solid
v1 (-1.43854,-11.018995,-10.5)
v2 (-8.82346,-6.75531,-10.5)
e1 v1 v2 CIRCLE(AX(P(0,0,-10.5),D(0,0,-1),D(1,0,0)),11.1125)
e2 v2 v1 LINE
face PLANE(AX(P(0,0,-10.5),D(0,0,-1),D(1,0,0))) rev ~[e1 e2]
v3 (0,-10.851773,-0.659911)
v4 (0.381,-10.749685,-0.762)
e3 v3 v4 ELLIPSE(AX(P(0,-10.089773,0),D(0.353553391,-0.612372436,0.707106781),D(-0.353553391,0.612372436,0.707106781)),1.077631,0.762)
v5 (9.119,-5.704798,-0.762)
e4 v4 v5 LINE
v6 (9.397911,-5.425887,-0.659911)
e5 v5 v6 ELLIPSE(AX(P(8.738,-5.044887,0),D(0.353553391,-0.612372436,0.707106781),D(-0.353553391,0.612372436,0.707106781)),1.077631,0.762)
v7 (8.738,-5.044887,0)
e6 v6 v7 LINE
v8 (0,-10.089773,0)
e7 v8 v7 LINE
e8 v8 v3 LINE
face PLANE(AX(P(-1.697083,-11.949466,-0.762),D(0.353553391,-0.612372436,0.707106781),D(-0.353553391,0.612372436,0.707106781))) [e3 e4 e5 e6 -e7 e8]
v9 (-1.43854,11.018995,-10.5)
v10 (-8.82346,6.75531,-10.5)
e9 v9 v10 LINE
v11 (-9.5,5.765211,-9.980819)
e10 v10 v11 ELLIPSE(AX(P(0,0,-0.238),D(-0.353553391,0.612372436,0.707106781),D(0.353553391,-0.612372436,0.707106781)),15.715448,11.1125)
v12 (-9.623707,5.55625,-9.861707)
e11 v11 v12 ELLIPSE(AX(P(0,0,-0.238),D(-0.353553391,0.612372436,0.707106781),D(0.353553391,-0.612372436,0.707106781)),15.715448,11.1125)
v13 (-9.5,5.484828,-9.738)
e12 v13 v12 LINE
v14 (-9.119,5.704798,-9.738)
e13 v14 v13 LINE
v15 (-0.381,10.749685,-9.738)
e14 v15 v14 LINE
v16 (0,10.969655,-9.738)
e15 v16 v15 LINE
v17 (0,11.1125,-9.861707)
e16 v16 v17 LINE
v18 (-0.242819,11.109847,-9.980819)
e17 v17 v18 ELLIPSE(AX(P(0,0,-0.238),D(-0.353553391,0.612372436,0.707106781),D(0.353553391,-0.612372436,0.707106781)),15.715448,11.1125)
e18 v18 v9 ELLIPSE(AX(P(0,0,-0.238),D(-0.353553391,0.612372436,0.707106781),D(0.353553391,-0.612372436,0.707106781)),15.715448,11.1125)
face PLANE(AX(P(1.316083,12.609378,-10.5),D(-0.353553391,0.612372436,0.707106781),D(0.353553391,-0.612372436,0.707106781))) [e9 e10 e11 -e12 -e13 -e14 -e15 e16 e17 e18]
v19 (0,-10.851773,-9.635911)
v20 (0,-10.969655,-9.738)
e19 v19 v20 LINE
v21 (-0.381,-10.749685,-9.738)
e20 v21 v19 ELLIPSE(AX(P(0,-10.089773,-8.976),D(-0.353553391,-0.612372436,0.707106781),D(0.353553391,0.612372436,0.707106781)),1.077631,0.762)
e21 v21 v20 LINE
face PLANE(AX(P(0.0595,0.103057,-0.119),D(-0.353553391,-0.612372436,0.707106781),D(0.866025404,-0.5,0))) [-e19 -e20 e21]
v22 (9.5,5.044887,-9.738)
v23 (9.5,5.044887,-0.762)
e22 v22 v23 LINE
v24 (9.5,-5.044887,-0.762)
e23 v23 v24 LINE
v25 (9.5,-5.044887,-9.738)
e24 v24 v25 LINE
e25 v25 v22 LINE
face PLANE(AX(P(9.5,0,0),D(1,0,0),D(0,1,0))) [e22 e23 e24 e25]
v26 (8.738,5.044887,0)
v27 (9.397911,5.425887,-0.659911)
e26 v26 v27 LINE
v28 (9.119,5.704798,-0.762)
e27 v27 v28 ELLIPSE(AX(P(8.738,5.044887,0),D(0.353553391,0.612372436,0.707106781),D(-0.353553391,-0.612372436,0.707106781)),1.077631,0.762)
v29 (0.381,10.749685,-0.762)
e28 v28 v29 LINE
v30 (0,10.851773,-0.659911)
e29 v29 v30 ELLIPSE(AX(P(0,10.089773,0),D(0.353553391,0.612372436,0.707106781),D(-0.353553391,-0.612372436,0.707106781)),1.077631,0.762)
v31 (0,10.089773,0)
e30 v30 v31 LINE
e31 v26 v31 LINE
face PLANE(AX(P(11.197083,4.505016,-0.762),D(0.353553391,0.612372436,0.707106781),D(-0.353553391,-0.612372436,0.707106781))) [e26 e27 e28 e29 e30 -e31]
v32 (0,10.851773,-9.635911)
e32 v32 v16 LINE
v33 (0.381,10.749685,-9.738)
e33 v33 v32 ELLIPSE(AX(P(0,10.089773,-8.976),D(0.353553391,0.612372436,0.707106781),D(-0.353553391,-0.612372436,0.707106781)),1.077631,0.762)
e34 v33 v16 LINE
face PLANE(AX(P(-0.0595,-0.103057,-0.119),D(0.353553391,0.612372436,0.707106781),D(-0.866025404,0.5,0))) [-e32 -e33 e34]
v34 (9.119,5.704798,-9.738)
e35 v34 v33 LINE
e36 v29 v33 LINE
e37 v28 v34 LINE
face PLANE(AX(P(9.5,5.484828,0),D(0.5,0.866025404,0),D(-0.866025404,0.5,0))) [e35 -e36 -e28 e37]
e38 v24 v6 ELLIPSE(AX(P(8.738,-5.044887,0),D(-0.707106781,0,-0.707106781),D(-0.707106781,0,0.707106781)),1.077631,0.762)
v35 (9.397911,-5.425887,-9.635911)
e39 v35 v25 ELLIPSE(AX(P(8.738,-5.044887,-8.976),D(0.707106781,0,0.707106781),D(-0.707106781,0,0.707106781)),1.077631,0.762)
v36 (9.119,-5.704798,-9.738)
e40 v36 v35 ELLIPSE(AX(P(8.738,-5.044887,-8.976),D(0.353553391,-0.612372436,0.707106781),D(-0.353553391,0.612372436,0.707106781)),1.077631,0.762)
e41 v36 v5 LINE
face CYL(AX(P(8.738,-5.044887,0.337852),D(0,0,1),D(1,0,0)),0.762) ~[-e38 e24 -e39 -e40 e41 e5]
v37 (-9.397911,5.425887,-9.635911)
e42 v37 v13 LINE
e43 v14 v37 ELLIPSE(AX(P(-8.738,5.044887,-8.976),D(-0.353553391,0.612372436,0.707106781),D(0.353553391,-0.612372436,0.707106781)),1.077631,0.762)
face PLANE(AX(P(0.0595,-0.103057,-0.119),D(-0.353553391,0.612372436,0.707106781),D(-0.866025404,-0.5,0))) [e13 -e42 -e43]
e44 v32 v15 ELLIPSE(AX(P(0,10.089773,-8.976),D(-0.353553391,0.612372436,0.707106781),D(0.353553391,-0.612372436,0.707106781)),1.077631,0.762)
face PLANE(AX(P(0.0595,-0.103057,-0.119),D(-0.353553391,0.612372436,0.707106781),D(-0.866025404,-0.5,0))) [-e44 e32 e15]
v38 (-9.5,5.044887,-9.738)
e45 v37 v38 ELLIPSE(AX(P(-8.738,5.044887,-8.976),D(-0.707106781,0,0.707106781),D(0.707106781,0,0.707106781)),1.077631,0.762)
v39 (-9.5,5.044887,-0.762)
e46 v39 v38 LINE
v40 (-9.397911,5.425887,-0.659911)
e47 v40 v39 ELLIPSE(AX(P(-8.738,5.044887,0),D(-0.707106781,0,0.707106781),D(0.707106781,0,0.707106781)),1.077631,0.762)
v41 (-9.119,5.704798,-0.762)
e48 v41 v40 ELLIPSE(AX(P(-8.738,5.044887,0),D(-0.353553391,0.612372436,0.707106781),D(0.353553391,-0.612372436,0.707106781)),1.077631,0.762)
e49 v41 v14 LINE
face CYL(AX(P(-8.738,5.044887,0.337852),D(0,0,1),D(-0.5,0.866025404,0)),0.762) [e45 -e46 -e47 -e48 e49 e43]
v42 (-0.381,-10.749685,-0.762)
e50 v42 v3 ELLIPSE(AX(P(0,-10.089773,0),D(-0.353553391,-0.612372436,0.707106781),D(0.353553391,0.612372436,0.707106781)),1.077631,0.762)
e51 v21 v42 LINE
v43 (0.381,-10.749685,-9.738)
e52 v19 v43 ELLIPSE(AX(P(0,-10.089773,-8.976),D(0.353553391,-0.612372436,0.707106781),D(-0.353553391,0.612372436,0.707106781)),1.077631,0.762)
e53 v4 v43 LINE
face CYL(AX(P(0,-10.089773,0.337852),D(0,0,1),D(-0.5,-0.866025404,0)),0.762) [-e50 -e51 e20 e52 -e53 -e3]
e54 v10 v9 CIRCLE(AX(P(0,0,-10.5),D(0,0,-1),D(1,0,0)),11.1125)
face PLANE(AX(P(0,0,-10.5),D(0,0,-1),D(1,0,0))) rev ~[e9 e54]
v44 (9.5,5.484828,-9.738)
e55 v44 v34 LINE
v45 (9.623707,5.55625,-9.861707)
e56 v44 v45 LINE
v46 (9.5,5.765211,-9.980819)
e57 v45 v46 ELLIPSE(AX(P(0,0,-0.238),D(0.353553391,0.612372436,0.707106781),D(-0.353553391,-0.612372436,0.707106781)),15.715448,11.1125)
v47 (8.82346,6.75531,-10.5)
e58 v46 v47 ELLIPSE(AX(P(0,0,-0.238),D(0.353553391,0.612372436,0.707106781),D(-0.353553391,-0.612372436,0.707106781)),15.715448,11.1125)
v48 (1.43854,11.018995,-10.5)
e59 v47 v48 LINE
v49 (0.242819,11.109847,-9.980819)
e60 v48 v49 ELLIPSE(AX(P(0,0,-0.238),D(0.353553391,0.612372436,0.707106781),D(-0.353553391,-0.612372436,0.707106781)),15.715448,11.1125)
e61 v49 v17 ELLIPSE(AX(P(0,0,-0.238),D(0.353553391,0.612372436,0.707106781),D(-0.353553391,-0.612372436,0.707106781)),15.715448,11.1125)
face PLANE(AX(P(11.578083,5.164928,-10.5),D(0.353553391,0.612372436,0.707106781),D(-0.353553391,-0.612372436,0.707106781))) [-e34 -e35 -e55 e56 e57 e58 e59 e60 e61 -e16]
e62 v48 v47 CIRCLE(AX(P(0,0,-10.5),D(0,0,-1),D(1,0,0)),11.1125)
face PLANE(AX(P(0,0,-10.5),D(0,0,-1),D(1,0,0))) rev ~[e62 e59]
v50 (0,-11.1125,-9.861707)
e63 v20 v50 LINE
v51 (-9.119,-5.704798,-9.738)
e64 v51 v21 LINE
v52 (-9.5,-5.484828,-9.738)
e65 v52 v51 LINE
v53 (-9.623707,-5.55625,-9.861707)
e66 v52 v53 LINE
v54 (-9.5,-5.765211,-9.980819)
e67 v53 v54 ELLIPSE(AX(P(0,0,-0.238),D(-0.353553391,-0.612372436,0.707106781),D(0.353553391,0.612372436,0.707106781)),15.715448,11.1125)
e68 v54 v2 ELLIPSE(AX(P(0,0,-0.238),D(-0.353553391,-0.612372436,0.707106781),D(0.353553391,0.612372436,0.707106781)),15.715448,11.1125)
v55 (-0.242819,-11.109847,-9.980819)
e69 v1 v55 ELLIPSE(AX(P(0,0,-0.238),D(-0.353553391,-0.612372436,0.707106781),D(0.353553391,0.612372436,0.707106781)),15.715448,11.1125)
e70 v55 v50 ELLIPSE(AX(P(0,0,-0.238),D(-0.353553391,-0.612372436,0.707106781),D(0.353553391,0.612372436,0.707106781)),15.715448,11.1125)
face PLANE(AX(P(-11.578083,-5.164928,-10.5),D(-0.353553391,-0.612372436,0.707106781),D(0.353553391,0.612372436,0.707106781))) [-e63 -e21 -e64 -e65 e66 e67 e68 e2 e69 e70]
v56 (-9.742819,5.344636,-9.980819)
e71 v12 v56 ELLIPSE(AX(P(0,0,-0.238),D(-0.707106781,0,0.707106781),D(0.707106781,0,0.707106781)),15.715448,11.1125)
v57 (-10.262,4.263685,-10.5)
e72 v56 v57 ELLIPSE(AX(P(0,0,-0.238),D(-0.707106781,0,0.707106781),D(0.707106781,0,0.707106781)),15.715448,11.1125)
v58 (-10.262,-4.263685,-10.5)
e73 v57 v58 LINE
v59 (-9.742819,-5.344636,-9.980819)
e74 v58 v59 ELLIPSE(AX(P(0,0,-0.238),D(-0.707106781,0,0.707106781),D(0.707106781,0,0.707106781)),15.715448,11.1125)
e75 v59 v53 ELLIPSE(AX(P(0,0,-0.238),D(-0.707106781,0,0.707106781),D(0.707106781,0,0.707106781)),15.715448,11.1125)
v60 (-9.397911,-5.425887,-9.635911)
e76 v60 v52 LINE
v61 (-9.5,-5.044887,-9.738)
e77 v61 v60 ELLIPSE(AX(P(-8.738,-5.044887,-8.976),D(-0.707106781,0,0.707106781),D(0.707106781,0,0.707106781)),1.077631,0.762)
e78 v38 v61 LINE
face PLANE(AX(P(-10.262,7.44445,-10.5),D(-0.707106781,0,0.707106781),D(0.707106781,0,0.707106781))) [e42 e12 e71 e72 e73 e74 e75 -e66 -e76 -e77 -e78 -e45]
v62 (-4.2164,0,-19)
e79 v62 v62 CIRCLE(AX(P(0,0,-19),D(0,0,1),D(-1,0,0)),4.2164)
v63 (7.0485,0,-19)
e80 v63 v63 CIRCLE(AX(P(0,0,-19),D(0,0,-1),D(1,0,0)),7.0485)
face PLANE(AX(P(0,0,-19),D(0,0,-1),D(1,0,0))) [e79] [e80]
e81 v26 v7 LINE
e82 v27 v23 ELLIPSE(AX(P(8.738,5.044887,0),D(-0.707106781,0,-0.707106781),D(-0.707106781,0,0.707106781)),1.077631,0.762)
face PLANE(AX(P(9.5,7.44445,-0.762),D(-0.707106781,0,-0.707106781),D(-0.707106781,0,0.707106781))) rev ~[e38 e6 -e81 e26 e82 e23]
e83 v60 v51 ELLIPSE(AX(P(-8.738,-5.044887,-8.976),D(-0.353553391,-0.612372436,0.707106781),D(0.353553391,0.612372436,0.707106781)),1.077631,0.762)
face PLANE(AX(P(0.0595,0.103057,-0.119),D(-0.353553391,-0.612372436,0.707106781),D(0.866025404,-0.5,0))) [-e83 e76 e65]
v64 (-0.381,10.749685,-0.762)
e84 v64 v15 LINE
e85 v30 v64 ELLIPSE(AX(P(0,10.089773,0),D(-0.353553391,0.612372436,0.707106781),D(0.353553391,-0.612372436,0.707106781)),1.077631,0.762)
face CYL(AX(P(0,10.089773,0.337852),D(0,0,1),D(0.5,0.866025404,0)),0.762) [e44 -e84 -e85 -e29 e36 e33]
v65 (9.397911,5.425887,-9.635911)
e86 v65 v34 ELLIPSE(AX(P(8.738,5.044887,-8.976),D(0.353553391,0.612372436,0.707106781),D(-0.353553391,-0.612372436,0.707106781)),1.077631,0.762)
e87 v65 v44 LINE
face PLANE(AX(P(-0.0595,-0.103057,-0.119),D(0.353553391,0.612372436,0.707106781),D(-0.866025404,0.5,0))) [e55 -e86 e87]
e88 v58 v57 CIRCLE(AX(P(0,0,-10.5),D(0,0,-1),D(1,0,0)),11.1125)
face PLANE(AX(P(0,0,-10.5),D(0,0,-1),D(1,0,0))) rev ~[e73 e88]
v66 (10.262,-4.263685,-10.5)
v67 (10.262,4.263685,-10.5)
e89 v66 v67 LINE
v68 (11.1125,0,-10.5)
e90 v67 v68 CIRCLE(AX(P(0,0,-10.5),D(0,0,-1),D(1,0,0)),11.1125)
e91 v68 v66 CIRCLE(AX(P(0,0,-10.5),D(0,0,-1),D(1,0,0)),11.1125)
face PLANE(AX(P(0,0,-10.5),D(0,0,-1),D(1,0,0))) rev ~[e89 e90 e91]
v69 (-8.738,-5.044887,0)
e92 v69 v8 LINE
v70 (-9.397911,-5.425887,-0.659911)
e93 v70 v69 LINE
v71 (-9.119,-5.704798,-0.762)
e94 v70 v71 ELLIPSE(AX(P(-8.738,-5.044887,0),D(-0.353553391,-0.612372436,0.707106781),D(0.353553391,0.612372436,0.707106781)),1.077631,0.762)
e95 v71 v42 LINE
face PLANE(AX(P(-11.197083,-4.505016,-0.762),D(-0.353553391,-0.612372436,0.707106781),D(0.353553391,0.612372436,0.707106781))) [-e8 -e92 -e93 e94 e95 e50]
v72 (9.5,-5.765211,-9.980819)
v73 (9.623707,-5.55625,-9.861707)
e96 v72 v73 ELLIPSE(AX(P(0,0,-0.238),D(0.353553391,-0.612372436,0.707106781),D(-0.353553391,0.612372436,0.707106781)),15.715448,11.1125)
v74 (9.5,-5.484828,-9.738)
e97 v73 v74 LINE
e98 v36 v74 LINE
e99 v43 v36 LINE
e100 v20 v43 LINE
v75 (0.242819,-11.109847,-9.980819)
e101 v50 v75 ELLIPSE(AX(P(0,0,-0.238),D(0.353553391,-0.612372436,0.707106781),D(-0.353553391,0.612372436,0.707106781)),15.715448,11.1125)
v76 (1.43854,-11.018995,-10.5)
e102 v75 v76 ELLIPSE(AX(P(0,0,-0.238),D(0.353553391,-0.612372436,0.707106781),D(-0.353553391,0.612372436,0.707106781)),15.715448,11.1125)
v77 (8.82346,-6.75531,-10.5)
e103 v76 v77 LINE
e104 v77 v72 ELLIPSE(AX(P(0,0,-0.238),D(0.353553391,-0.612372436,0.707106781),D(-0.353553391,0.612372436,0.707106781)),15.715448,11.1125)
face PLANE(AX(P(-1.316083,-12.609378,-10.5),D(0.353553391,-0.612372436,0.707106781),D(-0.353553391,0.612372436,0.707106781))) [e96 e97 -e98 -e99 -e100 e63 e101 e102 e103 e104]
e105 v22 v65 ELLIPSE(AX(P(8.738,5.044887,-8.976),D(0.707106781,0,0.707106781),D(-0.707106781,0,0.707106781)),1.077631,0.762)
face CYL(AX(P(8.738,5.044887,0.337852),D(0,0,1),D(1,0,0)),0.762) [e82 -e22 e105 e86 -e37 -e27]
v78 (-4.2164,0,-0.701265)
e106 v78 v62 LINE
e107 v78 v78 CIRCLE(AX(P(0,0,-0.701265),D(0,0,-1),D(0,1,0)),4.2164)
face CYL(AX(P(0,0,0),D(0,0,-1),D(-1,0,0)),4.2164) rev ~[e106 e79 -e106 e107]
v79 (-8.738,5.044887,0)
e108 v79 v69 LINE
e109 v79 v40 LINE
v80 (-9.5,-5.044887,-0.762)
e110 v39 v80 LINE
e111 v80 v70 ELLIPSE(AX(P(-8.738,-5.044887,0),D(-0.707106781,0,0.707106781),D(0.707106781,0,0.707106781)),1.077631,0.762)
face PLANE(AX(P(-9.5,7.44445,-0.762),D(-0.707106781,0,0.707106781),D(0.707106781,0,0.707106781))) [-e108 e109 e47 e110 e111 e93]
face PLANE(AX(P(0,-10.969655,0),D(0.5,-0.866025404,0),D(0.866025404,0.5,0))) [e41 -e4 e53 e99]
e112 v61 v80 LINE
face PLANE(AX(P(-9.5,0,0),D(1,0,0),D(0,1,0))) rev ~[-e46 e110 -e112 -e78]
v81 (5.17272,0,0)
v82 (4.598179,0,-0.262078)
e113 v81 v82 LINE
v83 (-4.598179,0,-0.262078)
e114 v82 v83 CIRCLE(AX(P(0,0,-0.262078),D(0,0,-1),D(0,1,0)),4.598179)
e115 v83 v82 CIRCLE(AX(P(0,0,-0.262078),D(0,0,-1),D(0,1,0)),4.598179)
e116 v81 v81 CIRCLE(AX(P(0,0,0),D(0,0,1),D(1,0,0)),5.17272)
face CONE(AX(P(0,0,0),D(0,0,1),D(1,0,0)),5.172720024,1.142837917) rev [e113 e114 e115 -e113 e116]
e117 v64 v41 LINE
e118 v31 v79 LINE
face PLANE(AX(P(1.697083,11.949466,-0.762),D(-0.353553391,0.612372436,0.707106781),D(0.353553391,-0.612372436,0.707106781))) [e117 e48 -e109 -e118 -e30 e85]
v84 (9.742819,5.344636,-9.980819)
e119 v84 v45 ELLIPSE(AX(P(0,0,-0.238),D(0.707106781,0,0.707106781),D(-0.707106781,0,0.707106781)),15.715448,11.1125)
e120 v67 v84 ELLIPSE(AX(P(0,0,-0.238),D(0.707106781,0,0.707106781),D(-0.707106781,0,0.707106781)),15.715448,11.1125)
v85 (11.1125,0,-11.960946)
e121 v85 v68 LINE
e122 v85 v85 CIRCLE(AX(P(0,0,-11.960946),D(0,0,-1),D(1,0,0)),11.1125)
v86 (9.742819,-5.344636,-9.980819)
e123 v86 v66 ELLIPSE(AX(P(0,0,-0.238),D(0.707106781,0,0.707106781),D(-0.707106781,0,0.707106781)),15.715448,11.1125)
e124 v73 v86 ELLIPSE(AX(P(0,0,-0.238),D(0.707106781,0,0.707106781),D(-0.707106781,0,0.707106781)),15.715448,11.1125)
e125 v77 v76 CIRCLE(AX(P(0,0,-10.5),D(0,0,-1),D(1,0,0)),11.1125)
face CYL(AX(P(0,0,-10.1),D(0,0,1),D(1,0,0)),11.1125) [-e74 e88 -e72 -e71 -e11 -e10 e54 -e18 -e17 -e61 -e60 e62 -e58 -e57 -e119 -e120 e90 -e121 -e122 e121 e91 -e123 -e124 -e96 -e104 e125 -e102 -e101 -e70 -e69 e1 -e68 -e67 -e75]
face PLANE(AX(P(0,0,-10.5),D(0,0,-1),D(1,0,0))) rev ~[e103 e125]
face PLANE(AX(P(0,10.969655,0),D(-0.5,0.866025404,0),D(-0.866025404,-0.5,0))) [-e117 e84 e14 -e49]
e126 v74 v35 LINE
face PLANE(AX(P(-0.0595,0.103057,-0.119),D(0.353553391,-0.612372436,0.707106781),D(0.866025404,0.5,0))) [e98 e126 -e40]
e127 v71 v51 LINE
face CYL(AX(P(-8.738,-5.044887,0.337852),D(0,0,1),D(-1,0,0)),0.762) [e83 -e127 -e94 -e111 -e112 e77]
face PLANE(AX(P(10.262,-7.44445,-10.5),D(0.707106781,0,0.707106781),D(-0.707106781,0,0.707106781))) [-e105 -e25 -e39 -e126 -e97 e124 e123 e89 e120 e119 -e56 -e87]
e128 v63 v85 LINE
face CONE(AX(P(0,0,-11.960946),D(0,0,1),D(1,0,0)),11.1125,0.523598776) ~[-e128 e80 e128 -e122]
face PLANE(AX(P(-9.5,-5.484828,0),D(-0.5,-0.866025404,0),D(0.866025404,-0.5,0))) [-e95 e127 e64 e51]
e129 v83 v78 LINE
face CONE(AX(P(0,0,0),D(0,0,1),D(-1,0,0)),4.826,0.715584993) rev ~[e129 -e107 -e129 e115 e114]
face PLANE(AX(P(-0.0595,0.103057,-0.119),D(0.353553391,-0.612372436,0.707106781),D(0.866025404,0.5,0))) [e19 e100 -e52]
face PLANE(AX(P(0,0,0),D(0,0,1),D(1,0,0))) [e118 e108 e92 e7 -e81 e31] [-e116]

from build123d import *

# Parameters (mm, degrees)
F1_DEPTH       = 19
F2_D           = 8.4328
F2_CSINK_D     = 9.652
F2_CSINK_ANGLE = 82
F3_R           = 11.1125
F3_R_2         = 4.2164
F4_DEPTH       = 8.5
F5_SIZE2       = 7.039054482
F5_SIZE        = 4.064
F6_T1_DEPTH    = 14.8888999883
F6_T3_DEPTH    = 14.8888999883
F6_T5_DEPTH    = 14.8888999883
F6_T7_DEPTH    = 14.8888999883
F6_T9_DEPTH    = 14.8888999883
F7_T4_DEPTH    = 14.8888999883
F7_S5_R        = 11.1125
F7_T6_DEPTH    = 9
F7_T12_DEPTH   = 14.8888999883
F7_S13_R       = 11.1125
F7_T14_DEPTH   = 9
F7_T20_DEPTH   = 14.8888999883
F7_S21_R       = 11.1125
F7_T22_DEPTH   = 9
F7_T28_DEPTH   = 14.8888999883
F7_S29_R       = 11.1125
F7_T30_DEPTH   = 9
F7_T36_DEPTH   = 14.8888999883
F7_S37_R       = 11.1125
F7_T38_DEPTH   = 9
F7_T44_DEPTH   = 14.8888999883
F7_S45_R       = 11.1125
F7_T46_DEPTH   = 9
F7_T53_DEPTH   = 14.8888999883
F7_S54_R       = 11.1125
F7_T55_DEPTH   = 9
F7_T59_DEPTH   = 14.8888999883
F7_S60_R       = 11.1125
F7_T61_DEPTH   = 9
F7_T68_DEPTH   = 14.8888999883
F7_S69_R       = 11.1125
F7_T70_DEPTH   = 9
F7_T74_DEPTH   = 14.8888999883
F7_S75_R       = 11.1125
F7_T76_DEPTH   = 9
F7_T83_DEPTH   = 14.8888999883
F7_S84_R       = 11.1125
F7_T85_DEPTH   = 9
F7_T89_DEPTH   = 14.8888999883
F7_S90_R       = 11.1125
F7_T91_DEPTH   = 9
F7_T98_DEPTH   = 14.8888999883
F7_S99_R       = 11.1125
F7_T100_DEPTH  = 9
F7_T104_DEPTH  = 14.8888999883
F7_S105_R      = 11.1125
F7_T106_DEPTH  = 9
F7_T113_DEPTH  = 14.8888999883
F7_S114_R      = 11.1125
F7_T115_DEPTH  = 9
F7_T119_DEPTH  = 14.8888999883
F7_S120_R      = 11.1125
F7_T121_DEPTH  = 9
F7_T128_DEPTH  = 14.8888999883
F7_S129_R      = 11.1125
F7_T130_DEPTH  = 9
F7_T134_DEPTH  = 14.8888999883
F7_S135_R      = 11.1125
F7_T136_DEPTH  = 9
F8_T4_DEPTH    = 11.1757045256
F8_T10_DEPTH   = 11.1757045256
F8_T16_DEPTH   = 11.1757045256
F8_T22_DEPTH   = 11.1757045256
F8_T28_DEPTH   = 11.1757045256
F8_T34_DEPTH   = 11.1757045256
F8_T40_DEPTH   = 11.1757045256
F8_T46_DEPTH   = 11.1757045256
F8_T52_DEPTH   = 11.1757045256
F8_T58_DEPTH   = 11.1757045256
F8_T64_DEPTH   = 11.1757045256
F8_T70_DEPTH   = 11.1757045256
F8_T76_DEPTH   = 11.1757045256
F8_T82_DEPTH   = 11.1757045256
F8_T88_DEPTH   = 11.1757045256
F8_T94_DEPTH   = 11.1757045256
F8_T100_DEPTH  = 11.1757045256
F8_T106_DEPTH  = 11.1757045256


# Not quite as in the source:
# - a fillet or chamfer that OpenCascade refuses, or shapes differently, is made with other operations: its cross-section is extruded or revolved along the edge and cut away or added


with BuildPart() as f1:
    # F0 (on Top) → F1 (new body)
    with BuildSketch(Plane.XY):
        Polygon((9.5, -5.4848275573), (9.5, 5.4848275573), (0, 10.9696551146), (-9.5, 5.4848275573), (-9.5, -5.4848275573), (0, -10.9696551146), align=None)
    extrude(amount=-F1_DEPTH)

    # F2 (through all)
    with Locations(Plane.XY):
        with Locations((0, 0)):
            CounterSinkHole(F2_D / 2, F2_CSINK_D / 2, counter_sink_angle=F2_CSINK_ANGLE)

    # F3 (on face) → F4 (join)
    with BuildSketch(Plane(origin=(0, 0, -19), x_dir=(1, 0, 0), z_dir=(0, 0, -1))):
        Circle(F3_R)
        Circle(F3_R_2, mode=Mode.SUBTRACT)
    extrude(amount=-F4_DEPTH)

    # F5
    f5_edges = [f1.edges().sort_by_distance(p)[0] for p in [
        (-11.1125, 0, -19),
    ]]
    f5_side = f1.faces().sort_by_distance((-10.798191, 0, -19))[0]
    chamfer(f5_edges, length=F5_SIZE, length2=F5_SIZE2, reference=f5_side)

    # F6: chamfer of 0.762 on 7 edges, made by hand

    # F6_s2 → F6_t1 (cut)
    with BuildSketch(Plane.XZ.offset(-7.4444499941)):
        Polygon((9.5, -0.762), (8.738, 0), (9.5, 0), align=None)
        Polygon((-9.5, -0.762), (-8.738, 0), (-9.5, 0), align=None)
    extrude(amount=F6_T1_DEPTH, mode=Mode.SUBTRACT)

    # F6_s4 → F6_t3 (cut)
    with BuildSketch(Plane(origin=(-6.4470828121, -3.7222249971, 0), x_dir=(0, 0, 1), z_dir=(0.8660254038, 0.5, 0))):
        Polygon((-0.762, 9.5), (0, 8.738), (0, 9.5), align=None)
    extrude(amount=F6_T3_DEPTH, mode=Mode.SUBTRACT)

    # F6_s6 → F6_t5 (cut)
    with BuildSketch(Plane(origin=(6.4470828121, -3.7222249971, 0), x_dir=(0, 0, 1), z_dir=(-0.8660254038, 0.5, 0))):
        Polygon((-0.762, 9.5), (0, 8.738), (0, 9.5), align=None)
    extrude(amount=F6_T5_DEPTH, mode=Mode.SUBTRACT)

    # F6_s8 → F6_t7 (cut)
    with BuildSketch(Plane(origin=(-6.4470828121, 3.7222249971, 0), x_dir=(0, 0, 1), z_dir=(0.8660254038, -0.5, 0))):
        Polygon((-0.762, 9.5), (0, 8.738), (0, 9.5), align=None)
    extrude(amount=F6_T7_DEPTH, mode=Mode.SUBTRACT)

    # F6_s10 → F6_t9 (cut)
    with BuildSketch(Plane(origin=(6.4470828121, 3.7222249971, 0), x_dir=(0, 0, 1), z_dir=(-0.8660254038, -0.5, 0))):
        Polygon((-0.762, 9.5), (0, 8.738), (0, 9.5), align=None)
    extrude(amount=F6_T9_DEPTH, mode=Mode.SUBTRACT)

    # F6_s11 → F6_t12 (revolve, cut)
    with BuildSketch(Plane.XZ):
        Polygon((5.1727200241, 0), (4.5972787828, -0.2624888611), (4.8251319511, 0), align=None)
    revolve(axis=Axis((0, 0, 0), (0, 0, 1)), mode=Mode.SUBTRACT)

    # F7: chamfer of 0.762 on 6 edges, made by hand


with BuildPart() as f7_tool2:
    # F7_s3 → F7_t4 (new body)
    with BuildSketch(Plane(origin=(-6.4470828121, 3.7222249971, 0), x_dir=(0, 0, 1), z_dir=(0.8660254038, -0.5, 0))):
        Polygon((-10.5, 10.262), (-9.738, 9.5), (-10.5, 9.5), align=None)
    extrude(amount=F7_T4_DEPTH)

    # F7_s5 → F7_t6 (intersect, symmetric)
    with BuildSketch(Plane.XY.offset(-10.1)):
        Circle(F7_S5_R)
    extrude(amount=F7_T6_DEPTH, both=True, mode=Mode.INTERSECT)

    split(bisect_by=Plane(origin=(4.75, -8.227241336, 0), x_dir=(0, 0, 1), z_dir=(-0.5, 0.8660254038, 0)), keep=Keep.TOP)

    split(bisect_by=Plane.YZ.offset(-9.5), keep=Keep.TOP)


with BuildPart() as f1_1:
    add(f1.part)

    # F7_t1: union F7_tool2
    add(f7_tool2.part)


with BuildPart() as f7_tool10:
    # F7_s11 → F7_t12 (new body)
    with BuildSketch(Plane(origin=(-6.4470828121, -3.7222249971, 0), x_dir=(0, 0, 1), z_dir=(0.8660254038, 0.5, 0))):
        Polygon((-10.5, 10.262), (-9.738, 9.5), (-10.5, 9.5), align=None)
    extrude(amount=F7_T12_DEPTH)

    # F7_s13 → F7_t14 (intersect, symmetric)
    with BuildSketch(Plane.XY.offset(-10.1)):
        Circle(F7_S13_R)
    extrude(amount=F7_T14_DEPTH, both=True, mode=Mode.INTERSECT)

    split(bisect_by=Plane.YZ.offset(9.5), keep=Keep.BOTTOM)

    split(bisect_by=Plane(origin=(-4.75, -8.227241336, 0), x_dir=(0, 0, 1), z_dir=(0.5, 0.8660254038, 0)), keep=Keep.TOP)


with BuildPart() as f1_2:
    add(f1_1.part)

    # F7_t9: union F7_tool10
    add(f7_tool10.part)


with BuildPart() as f7_tool18:
    # F7_s19 → F7_t20 (new body)
    with BuildSketch(Plane.XZ.offset(7.4444499941)):
        Polygon((10.262, -10.5), (9.5, -9.738), (9.5, -10.5), align=None)
    extrude(amount=-F7_T20_DEPTH)

    # F7_s21 → F7_t22 (intersect, symmetric)
    with BuildSketch(Plane.XY.offset(-10.1)):
        Circle(F7_S21_R)
    extrude(amount=F7_T22_DEPTH, both=True, mode=Mode.INTERSECT)

    split(bisect_by=Plane(origin=(4.75, -8.227241336, 0), x_dir=(0, 0, 1), z_dir=(-0.5, 0.8660254038, 0)), keep=Keep.TOP)

    split(bisect_by=Plane(origin=(4.75, 8.227241336, 0), x_dir=(0, 0, 1), z_dir=(-0.5, -0.8660254038, 0)), keep=Keep.TOP)


with BuildPart() as f1_3:
    add(f1_2.part)

    # F7_t17: union F7_tool18
    add(f7_tool18.part)


with BuildPart() as f7_tool26:
    # F7_s27 → F7_t28 (new body)
    with BuildSketch(Plane(origin=(6.4470828121, -3.7222249971, 0), x_dir=(0, 0, 1), z_dir=(-0.8660254038, 0.5, 0))):
        Polygon((-10.5, 10.262), (-9.738, 9.5), (-10.5, 9.5), align=None)
    extrude(amount=F7_T28_DEPTH)

    # F7_s29 → F7_t30 (intersect, symmetric)
    with BuildSketch(Plane.XY.offset(-10.1)):
        Circle(F7_S29_R)
    extrude(amount=F7_T30_DEPTH, both=True, mode=Mode.INTERSECT)

    split(bisect_by=Plane(origin=(-4.75, 8.227241336, 0), x_dir=(0, 0, 1), z_dir=(0.5, -0.8660254038, 0)), keep=Keep.TOP)

    split(bisect_by=Plane.YZ.offset(9.5), keep=Keep.BOTTOM)


with BuildPart() as f1_4:
    add(f1_3.part)

    # F7_t25: union F7_tool26
    add(f7_tool26.part)


with BuildPart() as f7_tool34:
    # F7_s35 → F7_t36 (new body)
    with BuildSketch(Plane(origin=(6.4470828121, 3.7222249971, 0), x_dir=(0, 0, 1), z_dir=(-0.8660254038, -0.5, 0))):
        Polygon((-10.5, 10.262), (-9.738, 9.5), (-10.5, 9.5), align=None)
    extrude(amount=F7_T36_DEPTH)

    # F7_s37 → F7_t38 (intersect, symmetric)
    with BuildSketch(Plane.XY.offset(-10.1)):
        Circle(F7_S37_R)
    extrude(amount=F7_T38_DEPTH, both=True, mode=Mode.INTERSECT)

    split(bisect_by=Plane.YZ.offset(-9.5), keep=Keep.TOP)

    split(bisect_by=Plane(origin=(4.75, 8.227241336, 0), x_dir=(0, 0, 1), z_dir=(-0.5, -0.8660254038, 0)), keep=Keep.TOP)


with BuildPart() as f1_5:
    add(f1_4.part)

    # F7_t33: union F7_tool34
    add(f7_tool34.part)


with BuildPart() as f7_tool42:
    # F7_s43 → F7_t44 (new body)
    with BuildSketch(Plane.XZ.offset(-7.4444499941)):
        Polygon((-10.262, -10.5), (-9.5, -9.738), (-9.5, -10.5), align=None)
    extrude(amount=F7_T44_DEPTH)

    # F7_s45 → F7_t46 (intersect, symmetric)
    with BuildSketch(Plane.XY.offset(-10.1)):
        Circle(F7_S45_R)
    extrude(amount=F7_T46_DEPTH, both=True, mode=Mode.INTERSECT)

    split(bisect_by=Plane(origin=(-4.75, -8.227241336, 0), x_dir=(0, 0, 1), z_dir=(0.5, 0.8660254038, 0)), keep=Keep.TOP)

    split(bisect_by=Plane(origin=(-4.75, 8.227241336, 0), x_dir=(0, 0, 1), z_dir=(0.5, -0.8660254038, 0)), keep=Keep.TOP)


with BuildPart() as f1_6:
    add(f1_5.part)

    # F7_t41: union F7_tool42
    add(f7_tool42.part)


with BuildPart() as f7_tool51:
    # F7_s52 → F7_t53 (new body)
    with BuildSketch(Plane(origin=(-6.4470828121, 3.7222249971, 0), x_dir=(0, 0, 1), z_dir=(0.8660254038, -0.5, 0))):
        Polygon((-10.5, 10.262), (-9.738, 9.5), (-10.5, 9.5), align=None)
    extrude(amount=F7_T53_DEPTH)

    # F7_s54 → F7_t55 (intersect, symmetric)
    with BuildSketch(Plane.XY.offset(-10.1)):
        Circle(F7_S54_R)
    extrude(amount=F7_T55_DEPTH, both=True, mode=Mode.INTERSECT)

    split(bisect_by=Plane.YZ.offset(-9.5), keep=Keep.BOTTOM)


with BuildPart() as f7_tool57:
    # F7_s58 → F7_t59 (new body)
    with BuildSketch(Plane.XZ.offset(-7.4444499941)):
        Polygon((-10.262, -10.5), (-9.5, -9.738), (-9.5, -10.5), align=None)
    extrude(amount=F7_T59_DEPTH)

    # F7_s60 → F7_t61 (intersect, symmetric)
    with BuildSketch(Plane.XY.offset(-10.1)):
        Circle(F7_S60_R)
    extrude(amount=F7_T61_DEPTH, both=True, mode=Mode.INTERSECT)

    split(bisect_by=Plane(origin=(-4.75, -8.227241336, 0), x_dir=(0, 0, 1), z_dir=(-0.5, -0.8660254038, 0)), keep=Keep.TOP)


with BuildPart() as f7_tool51_1:
    add(f7_tool51.part)

    # F7_t63: intersect F7_tool57
    add(f7_tool57.part, mode=Mode.INTERSECT)


with BuildPart() as f1_7:
    add(f1_6.part)

    # F7_t49: union F7_tool51
    add(f7_tool51_1.part)


with BuildPart() as f7_tool66:
    # F7_s67 → F7_t68 (new body)
    with BuildSketch(Plane(origin=(-6.4470828121, -3.7222249971, 0), x_dir=(0, 0, 1), z_dir=(0.8660254038, 0.5, 0))):
        Polygon((-10.5, 10.262), (-9.738, 9.5), (-10.5, 9.5), align=None)
    extrude(amount=F7_T68_DEPTH)

    # F7_s69 → F7_t70 (intersect, symmetric)
    with BuildSketch(Plane.XY.offset(-10.1)):
        Circle(F7_S69_R)
    extrude(amount=F7_T70_DEPTH, both=True, mode=Mode.INTERSECT)

    split(bisect_by=Plane(origin=(-4.75, -8.227241336, 0), x_dir=(0, 0, 1), z_dir=(-0.5, -0.8660254038, 0)), keep=Keep.TOP)


with BuildPart() as f7_tool72:
    # F7_s73 → F7_t74 (new body)
    with BuildSketch(Plane(origin=(-6.4470828121, 3.7222249971, 0), x_dir=(0, 0, 1), z_dir=(0.8660254038, -0.5, 0))):
        Polygon((-10.5, 10.262), (-9.738, 9.5), (-10.5, 9.5), align=None)
    extrude(amount=F7_T74_DEPTH)

    # F7_s75 → F7_t76 (intersect, symmetric)
    with BuildSketch(Plane.XY.offset(-10.1)):
        Circle(F7_S75_R)
    extrude(amount=F7_T76_DEPTH, both=True, mode=Mode.INTERSECT)

    split(bisect_by=Plane(origin=(4.75, -8.227241336, 0), x_dir=(0, 0, 1), z_dir=(0.5, -0.8660254038, 0)), keep=Keep.TOP)


with BuildPart() as f7_tool66_1:
    add(f7_tool66.part)

    # F7_t78: intersect F7_tool72
    add(f7_tool72.part, mode=Mode.INTERSECT)


with BuildPart() as f1_8:
    add(f1_7.part)

    # F7_t64: union F7_tool66
    add(f7_tool66_1.part)


with BuildPart() as f7_tool81:
    # F7_s82 → F7_t83 (new body)
    with BuildSketch(Plane(origin=(-6.4470828121, -3.7222249971, 0), x_dir=(0, 0, 1), z_dir=(0.8660254038, 0.5, 0))):
        Polygon((-10.5, 10.262), (-9.738, 9.5), (-10.5, 9.5), align=None)
    extrude(amount=F7_T83_DEPTH)

    # F7_s84 → F7_t85 (intersect, symmetric)
    with BuildSketch(Plane.XY.offset(-10.1)):
        Circle(F7_S84_R)
    extrude(amount=F7_T85_DEPTH, both=True, mode=Mode.INTERSECT)

    split(bisect_by=Plane.YZ.offset(9.5), keep=Keep.TOP)


with BuildPart() as f7_tool87:
    # F7_s88 → F7_t89 (new body)
    with BuildSketch(Plane.XZ.offset(7.4444499941)):
        Polygon((10.262, -10.5), (9.5, -9.738), (9.5, -10.5), align=None)
    extrude(amount=-F7_T89_DEPTH)

    # F7_s90 → F7_t91 (intersect, symmetric)
    with BuildSketch(Plane.XY.offset(-10.1)):
        Circle(F7_S90_R)
    extrude(amount=F7_T91_DEPTH, both=True, mode=Mode.INTERSECT)

    split(bisect_by=Plane(origin=(4.75, -8.227241336, 0), x_dir=(0, 0, 1), z_dir=(0.5, -0.8660254038, 0)), keep=Keep.TOP)


with BuildPart() as f7_tool81_1:
    add(f7_tool81.part)

    # F7_t93: intersect F7_tool87
    add(f7_tool87.part, mode=Mode.INTERSECT)


with BuildPart() as f1_9:
    add(f1_8.part)

    # F7_t79: union F7_tool81
    add(f7_tool81_1.part)


with BuildPart() as f7_tool96:
    # F7_s97 → F7_t98 (new body)
    with BuildSketch(Plane(origin=(6.4470828121, -3.7222249971, 0), x_dir=(0, 0, 1), z_dir=(-0.8660254038, 0.5, 0))):
        Polygon((-10.5, 10.262), (-9.738, 9.5), (-10.5, 9.5), align=None)
    extrude(amount=F7_T98_DEPTH)

    # F7_s99 → F7_t100 (intersect, symmetric)
    with BuildSketch(Plane.XY.offset(-10.1)):
        Circle(F7_S99_R)
    extrude(amount=F7_T100_DEPTH, both=True, mode=Mode.INTERSECT)

    split(bisect_by=Plane.YZ.offset(9.5), keep=Keep.TOP)


with BuildPart() as f7_tool102:
    # F7_s103 → F7_t104 (new body)
    with BuildSketch(Plane.XZ.offset(7.4444499941)):
        Polygon((10.262, -10.5), (9.5, -9.738), (9.5, -10.5), align=None)
    extrude(amount=-F7_T104_DEPTH)

    # F7_s105 → F7_t106 (intersect, symmetric)
    with BuildSketch(Plane.XY.offset(-10.1)):
        Circle(F7_S105_R)
    extrude(amount=F7_T106_DEPTH, both=True, mode=Mode.INTERSECT)

    split(bisect_by=Plane(origin=(4.75, 8.227241336, 0), x_dir=(0, 0, 1), z_dir=(0.5, 0.8660254038, 0)), keep=Keep.TOP)


with BuildPart() as f7_tool96_1:
    add(f7_tool96.part)

    # F7_t108: intersect F7_tool102
    add(f7_tool102.part, mode=Mode.INTERSECT)


with BuildPart() as f1_10:
    add(f1_9.part)

    # F7_t94: union F7_tool96
    add(f7_tool96_1.part)


with BuildPart() as f7_tool111:
    # F7_s112 → F7_t113 (new body)
    with BuildSketch(Plane(origin=(6.4470828121, 3.7222249971, 0), x_dir=(0, 0, 1), z_dir=(-0.8660254038, -0.5, 0))):
        Polygon((-10.5, 10.262), (-9.738, 9.5), (-10.5, 9.5), align=None)
    extrude(amount=F7_T113_DEPTH)

    # F7_s114 → F7_t115 (intersect, symmetric)
    with BuildSketch(Plane.XY.offset(-10.1)):
        Circle(F7_S114_R)
    extrude(amount=F7_T115_DEPTH, both=True, mode=Mode.INTERSECT)

    split(bisect_by=Plane(origin=(4.75, 8.227241336, 0), x_dir=(0, 0, 1), z_dir=(0.5, 0.8660254038, 0)), keep=Keep.TOP)


with BuildPart() as f7_tool117:
    # F7_s118 → F7_t119 (new body)
    with BuildSketch(Plane(origin=(6.4470828121, -3.7222249971, 0), x_dir=(0, 0, 1), z_dir=(-0.8660254038, 0.5, 0))):
        Polygon((-10.5, 10.262), (-9.738, 9.5), (-10.5, 9.5), align=None)
    extrude(amount=F7_T119_DEPTH)

    # F7_s120 → F7_t121 (intersect, symmetric)
    with BuildSketch(Plane.XY.offset(-10.1)):
        Circle(F7_S120_R)
    extrude(amount=F7_T121_DEPTH, both=True, mode=Mode.INTERSECT)

    split(bisect_by=Plane(origin=(-4.75, 8.227241336, 0), x_dir=(0, 0, 1), z_dir=(-0.5, 0.8660254038, 0)), keep=Keep.TOP)


with BuildPart() as f7_tool111_1:
    add(f7_tool111.part)

    # F7_t123: intersect F7_tool117
    add(f7_tool117.part, mode=Mode.INTERSECT)


with BuildPart() as f1_11:
    add(f1_10.part)

    # F7_t109: union F7_tool111
    add(f7_tool111_1.part)


with BuildPart() as f7_tool126:
    # F7_s127 → F7_t128 (new body)
    with BuildSketch(Plane.XZ.offset(-7.4444499941)):
        Polygon((-10.262, -10.5), (-9.5, -9.738), (-9.5, -10.5), align=None)
    extrude(amount=F7_T128_DEPTH)

    # F7_s129 → F7_t130 (intersect, symmetric)
    with BuildSketch(Plane.XY.offset(-10.1)):
        Circle(F7_S129_R)
    extrude(amount=F7_T130_DEPTH, both=True, mode=Mode.INTERSECT)

    split(bisect_by=Plane(origin=(-4.75, 8.227241336, 0), x_dir=(0, 0, 1), z_dir=(-0.5, 0.8660254038, 0)), keep=Keep.TOP)


with BuildPart() as f7_tool132:
    # F7_s133 → F7_t134 (new body)
    with BuildSketch(Plane(origin=(6.4470828121, 3.7222249971, 0), x_dir=(0, 0, 1), z_dir=(-0.8660254038, -0.5, 0))):
        Polygon((-10.5, 10.262), (-9.738, 9.5), (-10.5, 9.5), align=None)
    extrude(amount=F7_T134_DEPTH)

    # F7_s135 → F7_t136 (intersect, symmetric)
    with BuildSketch(Plane.XY.offset(-10.1)):
        Circle(F7_S135_R)
    extrude(amount=F7_T136_DEPTH, both=True, mode=Mode.INTERSECT)

    split(bisect_by=Plane.YZ.offset(-9.5), keep=Keep.BOTTOM)


with BuildPart() as f7_tool126_1:
    add(f7_tool126.part)

    # F7_t138: intersect F7_tool132
    add(f7_tool132.part, mode=Mode.INTERSECT)


with BuildPart() as f1_12:
    add(f1_11.part)

    # F7_t124: union F7_tool126
    add(f7_tool126_1.part)

    # F8: fillet of radius 0.762 on 6 edges, made by hand


with BuildPart() as f8_tool2:
    # F8_s3 → F8_t4 (new body)
    with BuildSketch(Plane.XY.offset(0.3378522628)):
        with BuildLine():
            ThreePointArc((9.5, -5.0448866522), (9.3979113577, -5.4258866522), (9.119, -5.7047980099))
            Line((9.119, -5.7047980099), (9.5, -5.4848275573))
            Line((9.5, -5.4848275573), (9.5, -5.0448866522))
        make_face()
    extrude(amount=-F8_T4_DEPTH)

    split(bisect_by=Plane(origin=(-0.119, 0, -0.119), x_dir=(0, 1, 0), z_dir=(0.7071067812, 0, 0.7071067812)), keep=Keep.TOP)

    split(bisect_by=Plane(origin=(-0.0595, 0.1030570231, -0.119), x_dir=(0.8660254038, 0.5, 0), z_dir=(0.3535533906, -0.6123724357, 0.7071067812)), keep=Keep.TOP)


with BuildPart() as f1_13:
    add(f1_12.part)

    # F8_t1: cut F8_tool2
    add(f8_tool2.part, mode=Mode.SUBTRACT)


with BuildPart() as f8_tool8:
    # F8_s9 → F8_t10 (new body)
    with BuildSketch(Plane.XY.offset(0.3378522628)):
        with BuildLine():
            ThreePointArc((9.5, -5.0448866522), (9.3979113577, -5.4258866522), (9.119, -5.7047980099))
            Line((9.119, -5.7047980099), (9.5, -5.4848275573))
            Line((9.5, -5.4848275573), (9.5, -5.0448866522))
        make_face()
    extrude(amount=-F8_T10_DEPTH)

    split(bisect_by=Plane(origin=(-0.119, 0, -0.119), x_dir=(0, 1, 0), z_dir=(-0.7071067812, 0, -0.7071067812)), keep=Keep.TOP)

    split(bisect_by=Plane(origin=(-0.0595, 0.1030570231, -0.119), x_dir=(0.8660254038, 0.5, 0), z_dir=(0.3535533906, -0.6123724357, 0.7071067812)), keep=Keep.TOP)


with BuildPart() as f1_14:
    add(f1_13.part)

    # F8_t7: cut F8_tool8
    add(f8_tool8.part, mode=Mode.SUBTRACT)


with BuildPart() as f8_tool14:
    # F8_s15 → F8_t16 (new body)
    with BuildSketch(Plane.XY.offset(0.3378522628)):
        with BuildLine():
            ThreePointArc((9.5, -5.0448866522), (9.3979113577, -5.4258866522), (9.119, -5.7047980099))
            Line((9.119, -5.7047980099), (9.5, -5.4848275573))
            Line((9.5, -5.4848275573), (9.5, -5.0448866522))
        make_face()
    extrude(amount=-F8_T16_DEPTH)

    split(bisect_by=Plane(origin=(-0.119, 0, -0.119), x_dir=(0, 1, 0), z_dir=(0.7071067812, 0, 0.7071067812)), keep=Keep.TOP)

    split(bisect_by=Plane(origin=(-0.0595, 0.1030570231, -0.119), x_dir=(-0.8660254038, -0.5, 0), z_dir=(-0.3535533906, 0.6123724357, -0.7071067812)), keep=Keep.TOP)


with BuildPart() as f1_15:
    add(f1_14.part)

    # F8_t13: cut F8_tool14
    add(f8_tool14.part, mode=Mode.SUBTRACT)


with BuildPart() as f8_tool20:
    # F8_s21 → F8_t22 (new body)
    with BuildSketch(Plane.XY.offset(0.3378522628)):
        with BuildLine():
            ThreePointArc((-0.381, -10.749684662), (0, -10.8517733044), (0.381, -10.749684662))
            Line((0.381, -10.749684662), (0, -10.9696551146))
            Line((0, -10.9696551146), (-0.381, -10.749684662))
        make_face()
    extrude(amount=-F8_T22_DEPTH)

    split(bisect_by=Plane(origin=(0.0595, 0.1030570231, -0.119), x_dir=(0.8660254038, -0.5, 0), z_dir=(-0.3535533906, -0.6123724357, 0.7071067812)), keep=Keep.TOP)

    split(bisect_by=Plane(origin=(-0.0595, 0.1030570231, -0.119), x_dir=(0.8660254038, 0.5, 0), z_dir=(0.3535533906, -0.6123724357, 0.7071067812)), keep=Keep.TOP)


with BuildPart() as f1_16:
    add(f1_15.part)

    # F8_t19: cut F8_tool20
    add(f8_tool20.part, mode=Mode.SUBTRACT)


with BuildPart() as f8_tool26:
    # F8_s27 → F8_t28 (new body)
    with BuildSketch(Plane.XY.offset(0.3378522628)):
        with BuildLine():
            ThreePointArc((-0.381, -10.749684662), (0, -10.8517733044), (0.381, -10.749684662))
            Line((0.381, -10.749684662), (0, -10.9696551146))
            Line((0, -10.9696551146), (-0.381, -10.749684662))
        make_face()
    extrude(amount=-F8_T28_DEPTH)

    split(bisect_by=Plane(origin=(0.0595, 0.1030570231, -0.119), x_dir=(-0.8660254038, 0.5, 0), z_dir=(0.3535533906, 0.6123724357, -0.7071067812)), keep=Keep.TOP)

    split(bisect_by=Plane(origin=(-0.0595, 0.1030570231, -0.119), x_dir=(0.8660254038, 0.5, 0), z_dir=(0.3535533906, -0.6123724357, 0.7071067812)), keep=Keep.TOP)


with BuildPart() as f1_17:
    add(f1_16.part)

    # F8_t25: cut F8_tool26
    add(f8_tool26.part, mode=Mode.SUBTRACT)


with BuildPart() as f8_tool32:
    # F8_s33 → F8_t34 (new body)
    with BuildSketch(Plane.XY.offset(0.3378522628)):
        with BuildLine():
            ThreePointArc((-0.381, -10.749684662), (0, -10.8517733044), (0.381, -10.749684662))
            Line((0.381, -10.749684662), (0, -10.9696551146))
            Line((0, -10.9696551146), (-0.381, -10.749684662))
        make_face()
    extrude(amount=-F8_T34_DEPTH)

    split(bisect_by=Plane(origin=(0.0595, 0.1030570231, -0.119), x_dir=(0.8660254038, -0.5, 0), z_dir=(-0.3535533906, -0.6123724357, 0.7071067812)), keep=Keep.TOP)

    split(bisect_by=Plane(origin=(-0.0595, 0.1030570231, -0.119), x_dir=(-0.8660254038, -0.5, 0), z_dir=(-0.3535533906, 0.6123724357, -0.7071067812)), keep=Keep.TOP)


with BuildPart() as f1_18:
    add(f1_17.part)

    # F8_t31: cut F8_tool32
    add(f8_tool32.part, mode=Mode.SUBTRACT)


with BuildPart() as f8_tool38:
    # F8_s39 → F8_t40 (new body)
    with BuildSketch(Plane.XY.offset(0.3378522628)):
        with BuildLine():
            ThreePointArc((-9.5, -5.0448866522), (-9.3979113577, -5.4258866522), (-9.119, -5.7047980099))
            Line((-9.119, -5.7047980099), (-9.5, -5.4848275573))
            Line((-9.5, -5.4848275573), (-9.5, -5.0448866522))
        make_face()
    extrude(amount=-F8_T40_DEPTH)

    split(bisect_by=Plane(origin=(0.119, 0, -0.119), x_dir=(0, 1, 0), z_dir=(-0.7071067812, 0, 0.7071067812)), keep=Keep.TOP)

    split(bisect_by=Plane(origin=(0.0595, 0.1030570231, -0.119), x_dir=(0.8660254038, -0.5, 0), z_dir=(-0.3535533906, -0.6123724357, 0.7071067812)), keep=Keep.TOP)


with BuildPart() as f1_19:
    add(f1_18.part)

    # F8_t37: cut F8_tool38
    add(f8_tool38.part, mode=Mode.SUBTRACT)


with BuildPart() as f8_tool44:
    # F8_s45 → F8_t46 (new body)
    with BuildSketch(Plane.XY.offset(0.3378522628)):
        with BuildLine():
            ThreePointArc((-9.5, -5.0448866522), (-9.3979113577, -5.4258866522), (-9.119, -5.7047980099))
            Line((-9.119, -5.7047980099), (-9.5, -5.4848275573))
            Line((-9.5, -5.4848275573), (-9.5, -5.0448866522))
        make_face()
    extrude(amount=-F8_T46_DEPTH)

    split(bisect_by=Plane(origin=(0.119, 0, -0.119), x_dir=(0, 1, 0), z_dir=(0.7071067812, 0, -0.7071067812)), keep=Keep.TOP)

    split(bisect_by=Plane(origin=(0.0595, 0.1030570231, -0.119), x_dir=(0.8660254038, -0.5, 0), z_dir=(-0.3535533906, -0.6123724357, 0.7071067812)), keep=Keep.TOP)


with BuildPart() as f1_20:
    add(f1_19.part)

    # F8_t43: cut F8_tool44
    add(f8_tool44.part, mode=Mode.SUBTRACT)


with BuildPart() as f8_tool50:
    # F8_s51 → F8_t52 (new body)
    with BuildSketch(Plane.XY.offset(0.3378522628)):
        with BuildLine():
            ThreePointArc((-9.5, -5.0448866522), (-9.3979113577, -5.4258866522), (-9.119, -5.7047980099))
            Line((-9.119, -5.7047980099), (-9.5, -5.4848275573))
            Line((-9.5, -5.4848275573), (-9.5, -5.0448866522))
        make_face()
    extrude(amount=-F8_T52_DEPTH)

    split(bisect_by=Plane(origin=(0.119, 0, -0.119), x_dir=(0, 1, 0), z_dir=(-0.7071067812, 0, 0.7071067812)), keep=Keep.TOP)

    split(bisect_by=Plane(origin=(0.0595, 0.1030570231, -0.119), x_dir=(-0.8660254038, 0.5, 0), z_dir=(0.3535533906, 0.6123724357, -0.7071067812)), keep=Keep.TOP)


with BuildPart() as f1_21:
    add(f1_20.part)

    # F8_t49: cut F8_tool50
    add(f8_tool50.part, mode=Mode.SUBTRACT)


with BuildPart() as f8_tool56:
    # F8_s57 → F8_t58 (new body)
    with BuildSketch(Plane.XY.offset(0.3378522628)):
        with BuildLine():
            ThreePointArc((-9.119, 5.7047980099), (-9.3979113577, 5.4258866522), (-9.5, 5.0448866522))
            Line((-9.5, 5.0448866522), (-9.5, 5.4848275573))
            Line((-9.5, 5.4848275573), (-9.119, 5.7047980099))
        make_face()
    extrude(amount=-F8_T58_DEPTH)

    split(bisect_by=Plane(origin=(0.0595, -0.1030570231, -0.119), x_dir=(-0.8660254038, -0.5, 0), z_dir=(-0.3535533906, 0.6123724357, 0.7071067812)), keep=Keep.TOP)

    split(bisect_by=Plane(origin=(0.119, 0, -0.119), x_dir=(0, 1, 0), z_dir=(-0.7071067812, 0, 0.7071067812)), keep=Keep.TOP)


with BuildPart() as f1_22:
    add(f1_21.part)

    # F8_t55: cut F8_tool56
    add(f8_tool56.part, mode=Mode.SUBTRACT)


with BuildPart() as f8_tool62:
    # F8_s63 → F8_t64 (new body)
    with BuildSketch(Plane.XY.offset(0.3378522628)):
        with BuildLine():
            ThreePointArc((-9.119, 5.7047980099), (-9.3979113577, 5.4258866522), (-9.5, 5.0448866522))
            Line((-9.5, 5.0448866522), (-9.5, 5.4848275573))
            Line((-9.5, 5.4848275573), (-9.119, 5.7047980099))
        make_face()
    extrude(amount=-F8_T64_DEPTH)

    split(bisect_by=Plane(origin=(0.0595, -0.1030570231, -0.119), x_dir=(0.8660254038, 0.5, 0), z_dir=(0.3535533906, -0.6123724357, -0.7071067812)), keep=Keep.TOP)

    split(bisect_by=Plane(origin=(0.119, 0, -0.119), x_dir=(0, 1, 0), z_dir=(-0.7071067812, 0, 0.7071067812)), keep=Keep.TOP)


with BuildPart() as f1_23:
    add(f1_22.part)

    # F8_t61: cut F8_tool62
    add(f8_tool62.part, mode=Mode.SUBTRACT)


with BuildPart() as f8_tool68:
    # F8_s69 → F8_t70 (new body)
    with BuildSketch(Plane.XY.offset(0.3378522628)):
        with BuildLine():
            ThreePointArc((-9.119, 5.7047980099), (-9.3979113577, 5.4258866522), (-9.5, 5.0448866522))
            Line((-9.5, 5.0448866522), (-9.5, 5.4848275573))
            Line((-9.5, 5.4848275573), (-9.119, 5.7047980099))
        make_face()
    extrude(amount=-F8_T70_DEPTH)

    split(bisect_by=Plane(origin=(0.0595, -0.1030570231, -0.119), x_dir=(-0.8660254038, -0.5, 0), z_dir=(-0.3535533906, 0.6123724357, 0.7071067812)), keep=Keep.TOP)

    split(bisect_by=Plane(origin=(0.119, 0, -0.119), x_dir=(0, 1, 0), z_dir=(0.7071067812, 0, -0.7071067812)), keep=Keep.TOP)


with BuildPart() as f1_24:
    add(f1_23.part)

    # F8_t67: cut F8_tool68
    add(f8_tool68.part, mode=Mode.SUBTRACT)


with BuildPart() as f8_tool74:
    # F8_s75 → F8_t76 (new body)
    with BuildSketch(Plane.XY.offset(0.3378522628)):
        with BuildLine():
            ThreePointArc((0.381, 10.749684662), (0, 10.8517733044), (-0.381, 10.749684662))
            Line((-0.381, 10.749684662), (0, 10.9696551146))
            Line((0, 10.9696551146), (0.381, 10.749684662))
        make_face()
    extrude(amount=-F8_T76_DEPTH)

    split(bisect_by=Plane(origin=(-0.0595, -0.1030570231, -0.119), x_dir=(-0.8660254038, 0.5, 0), z_dir=(0.3535533906, 0.6123724357, 0.7071067812)), keep=Keep.TOP)

    split(bisect_by=Plane(origin=(0.0595, -0.1030570231, -0.119), x_dir=(-0.8660254038, -0.5, 0), z_dir=(-0.3535533906, 0.6123724357, 0.7071067812)), keep=Keep.TOP)


with BuildPart() as f1_25:
    add(f1_24.part)

    # F8_t73: cut F8_tool74
    add(f8_tool74.part, mode=Mode.SUBTRACT)


with BuildPart() as f8_tool80:
    # F8_s81 → F8_t82 (new body)
    with BuildSketch(Plane.XY.offset(0.3378522628)):
        with BuildLine():
            ThreePointArc((0.381, 10.749684662), (0, 10.8517733044), (-0.381, 10.749684662))
            Line((-0.381, 10.749684662), (0, 10.9696551146))
            Line((0, 10.9696551146), (0.381, 10.749684662))
        make_face()
    extrude(amount=-F8_T82_DEPTH)

    split(bisect_by=Plane(origin=(-0.0595, -0.1030570231, -0.119), x_dir=(0.8660254038, -0.5, 0), z_dir=(-0.3535533906, -0.6123724357, -0.7071067812)), keep=Keep.TOP)

    split(bisect_by=Plane(origin=(0.0595, -0.1030570231, -0.119), x_dir=(-0.8660254038, -0.5, 0), z_dir=(-0.3535533906, 0.6123724357, 0.7071067812)), keep=Keep.TOP)


with BuildPart() as f1_26:
    add(f1_25.part)

    # F8_t79: cut F8_tool80
    add(f8_tool80.part, mode=Mode.SUBTRACT)


with BuildPart() as f8_tool86:
    # F8_s87 → F8_t88 (new body)
    with BuildSketch(Plane.XY.offset(0.3378522628)):
        with BuildLine():
            ThreePointArc((0.381, 10.749684662), (0, 10.8517733044), (-0.381, 10.749684662))
            Line((-0.381, 10.749684662), (0, 10.9696551146))
            Line((0, 10.9696551146), (0.381, 10.749684662))
        make_face()
    extrude(amount=-F8_T88_DEPTH)

    split(bisect_by=Plane(origin=(-0.0595, -0.1030570231, -0.119), x_dir=(-0.8660254038, 0.5, 0), z_dir=(0.3535533906, 0.6123724357, 0.7071067812)), keep=Keep.TOP)

    split(bisect_by=Plane(origin=(0.0595, -0.1030570231, -0.119), x_dir=(0.8660254038, 0.5, 0), z_dir=(0.3535533906, -0.6123724357, -0.7071067812)), keep=Keep.TOP)


with BuildPart() as f1_27:
    add(f1_26.part)

    # F8_t85: cut F8_tool86
    add(f8_tool86.part, mode=Mode.SUBTRACT)


with BuildPart() as f8_tool92:
    # F8_s93 → F8_t94 (new body)
    with BuildSketch(Plane.XY.offset(0.3378522628)):
        with BuildLine():
            ThreePointArc((9.5, 5.0448866522), (9.3979113577, 5.4258866522), (9.119, 5.7047980099))
            Line((9.119, 5.7047980099), (9.5, 5.4848275573))
            Line((9.5, 5.4848275573), (9.5, 5.0448866522))
        make_face()
    extrude(amount=-F8_T94_DEPTH)

    split(bisect_by=Plane(origin=(-0.119, 0, -0.119), x_dir=(0, 1, 0), z_dir=(0.7071067812, 0, 0.7071067812)), keep=Keep.TOP)

    split(bisect_by=Plane(origin=(-0.0595, -0.1030570231, -0.119), x_dir=(-0.8660254038, 0.5, 0), z_dir=(0.3535533906, 0.6123724357, 0.7071067812)), keep=Keep.TOP)


with BuildPart() as f1_28:
    add(f1_27.part)

    # F8_t91: cut F8_tool92
    add(f8_tool92.part, mode=Mode.SUBTRACT)


with BuildPart() as f8_tool98:
    # F8_s99 → F8_t100 (new body)
    with BuildSketch(Plane.XY.offset(0.3378522628)):
        with BuildLine():
            ThreePointArc((9.5, 5.0448866522), (9.3979113577, 5.4258866522), (9.119, 5.7047980099))
            Line((9.119, 5.7047980099), (9.5, 5.4848275573))
            Line((9.5, 5.4848275573), (9.5, 5.0448866522))
        make_face()
    extrude(amount=-F8_T100_DEPTH)

    split(bisect_by=Plane(origin=(-0.119, 0, -0.119), x_dir=(0, 1, 0), z_dir=(-0.7071067812, 0, -0.7071067812)), keep=Keep.TOP)

    split(bisect_by=Plane(origin=(-0.0595, -0.1030570231, -0.119), x_dir=(-0.8660254038, 0.5, 0), z_dir=(0.3535533906, 0.6123724357, 0.7071067812)), keep=Keep.TOP)


with BuildPart() as f1_29:
    add(f1_28.part)

    # F8_t97: cut F8_tool98
    add(f8_tool98.part, mode=Mode.SUBTRACT)


with BuildPart() as f8_tool104:
    # F8_s105 → F8_t106 (new body)
    with BuildSketch(Plane.XY.offset(0.3378522628)):
        with BuildLine():
            ThreePointArc((9.5, 5.0448866522), (9.3979113577, 5.4258866522), (9.119, 5.7047980099))
            Line((9.119, 5.7047980099), (9.5, 5.4848275573))
            Line((9.5, 5.4848275573), (9.5, 5.0448866522))
        make_face()
    extrude(amount=-F8_T106_DEPTH)

    split(bisect_by=Plane(origin=(-0.119, 0, -0.119), x_dir=(0, 1, 0), z_dir=(0.7071067812, 0, 0.7071067812)), keep=Keep.TOP)

    split(bisect_by=Plane(origin=(-0.0595, -0.1030570231, -0.119), x_dir=(0.8660254038, -0.5, 0), z_dir=(-0.3535533906, -0.6123724357, -0.7071067812)), keep=Keep.TOP)


with BuildPart() as f1_30:
    add(f1_29.part)

    # F8_t103: cut F8_tool104
    add(f8_tool104.part, mode=Mode.SUBTRACT)


solid = f1_30.part
